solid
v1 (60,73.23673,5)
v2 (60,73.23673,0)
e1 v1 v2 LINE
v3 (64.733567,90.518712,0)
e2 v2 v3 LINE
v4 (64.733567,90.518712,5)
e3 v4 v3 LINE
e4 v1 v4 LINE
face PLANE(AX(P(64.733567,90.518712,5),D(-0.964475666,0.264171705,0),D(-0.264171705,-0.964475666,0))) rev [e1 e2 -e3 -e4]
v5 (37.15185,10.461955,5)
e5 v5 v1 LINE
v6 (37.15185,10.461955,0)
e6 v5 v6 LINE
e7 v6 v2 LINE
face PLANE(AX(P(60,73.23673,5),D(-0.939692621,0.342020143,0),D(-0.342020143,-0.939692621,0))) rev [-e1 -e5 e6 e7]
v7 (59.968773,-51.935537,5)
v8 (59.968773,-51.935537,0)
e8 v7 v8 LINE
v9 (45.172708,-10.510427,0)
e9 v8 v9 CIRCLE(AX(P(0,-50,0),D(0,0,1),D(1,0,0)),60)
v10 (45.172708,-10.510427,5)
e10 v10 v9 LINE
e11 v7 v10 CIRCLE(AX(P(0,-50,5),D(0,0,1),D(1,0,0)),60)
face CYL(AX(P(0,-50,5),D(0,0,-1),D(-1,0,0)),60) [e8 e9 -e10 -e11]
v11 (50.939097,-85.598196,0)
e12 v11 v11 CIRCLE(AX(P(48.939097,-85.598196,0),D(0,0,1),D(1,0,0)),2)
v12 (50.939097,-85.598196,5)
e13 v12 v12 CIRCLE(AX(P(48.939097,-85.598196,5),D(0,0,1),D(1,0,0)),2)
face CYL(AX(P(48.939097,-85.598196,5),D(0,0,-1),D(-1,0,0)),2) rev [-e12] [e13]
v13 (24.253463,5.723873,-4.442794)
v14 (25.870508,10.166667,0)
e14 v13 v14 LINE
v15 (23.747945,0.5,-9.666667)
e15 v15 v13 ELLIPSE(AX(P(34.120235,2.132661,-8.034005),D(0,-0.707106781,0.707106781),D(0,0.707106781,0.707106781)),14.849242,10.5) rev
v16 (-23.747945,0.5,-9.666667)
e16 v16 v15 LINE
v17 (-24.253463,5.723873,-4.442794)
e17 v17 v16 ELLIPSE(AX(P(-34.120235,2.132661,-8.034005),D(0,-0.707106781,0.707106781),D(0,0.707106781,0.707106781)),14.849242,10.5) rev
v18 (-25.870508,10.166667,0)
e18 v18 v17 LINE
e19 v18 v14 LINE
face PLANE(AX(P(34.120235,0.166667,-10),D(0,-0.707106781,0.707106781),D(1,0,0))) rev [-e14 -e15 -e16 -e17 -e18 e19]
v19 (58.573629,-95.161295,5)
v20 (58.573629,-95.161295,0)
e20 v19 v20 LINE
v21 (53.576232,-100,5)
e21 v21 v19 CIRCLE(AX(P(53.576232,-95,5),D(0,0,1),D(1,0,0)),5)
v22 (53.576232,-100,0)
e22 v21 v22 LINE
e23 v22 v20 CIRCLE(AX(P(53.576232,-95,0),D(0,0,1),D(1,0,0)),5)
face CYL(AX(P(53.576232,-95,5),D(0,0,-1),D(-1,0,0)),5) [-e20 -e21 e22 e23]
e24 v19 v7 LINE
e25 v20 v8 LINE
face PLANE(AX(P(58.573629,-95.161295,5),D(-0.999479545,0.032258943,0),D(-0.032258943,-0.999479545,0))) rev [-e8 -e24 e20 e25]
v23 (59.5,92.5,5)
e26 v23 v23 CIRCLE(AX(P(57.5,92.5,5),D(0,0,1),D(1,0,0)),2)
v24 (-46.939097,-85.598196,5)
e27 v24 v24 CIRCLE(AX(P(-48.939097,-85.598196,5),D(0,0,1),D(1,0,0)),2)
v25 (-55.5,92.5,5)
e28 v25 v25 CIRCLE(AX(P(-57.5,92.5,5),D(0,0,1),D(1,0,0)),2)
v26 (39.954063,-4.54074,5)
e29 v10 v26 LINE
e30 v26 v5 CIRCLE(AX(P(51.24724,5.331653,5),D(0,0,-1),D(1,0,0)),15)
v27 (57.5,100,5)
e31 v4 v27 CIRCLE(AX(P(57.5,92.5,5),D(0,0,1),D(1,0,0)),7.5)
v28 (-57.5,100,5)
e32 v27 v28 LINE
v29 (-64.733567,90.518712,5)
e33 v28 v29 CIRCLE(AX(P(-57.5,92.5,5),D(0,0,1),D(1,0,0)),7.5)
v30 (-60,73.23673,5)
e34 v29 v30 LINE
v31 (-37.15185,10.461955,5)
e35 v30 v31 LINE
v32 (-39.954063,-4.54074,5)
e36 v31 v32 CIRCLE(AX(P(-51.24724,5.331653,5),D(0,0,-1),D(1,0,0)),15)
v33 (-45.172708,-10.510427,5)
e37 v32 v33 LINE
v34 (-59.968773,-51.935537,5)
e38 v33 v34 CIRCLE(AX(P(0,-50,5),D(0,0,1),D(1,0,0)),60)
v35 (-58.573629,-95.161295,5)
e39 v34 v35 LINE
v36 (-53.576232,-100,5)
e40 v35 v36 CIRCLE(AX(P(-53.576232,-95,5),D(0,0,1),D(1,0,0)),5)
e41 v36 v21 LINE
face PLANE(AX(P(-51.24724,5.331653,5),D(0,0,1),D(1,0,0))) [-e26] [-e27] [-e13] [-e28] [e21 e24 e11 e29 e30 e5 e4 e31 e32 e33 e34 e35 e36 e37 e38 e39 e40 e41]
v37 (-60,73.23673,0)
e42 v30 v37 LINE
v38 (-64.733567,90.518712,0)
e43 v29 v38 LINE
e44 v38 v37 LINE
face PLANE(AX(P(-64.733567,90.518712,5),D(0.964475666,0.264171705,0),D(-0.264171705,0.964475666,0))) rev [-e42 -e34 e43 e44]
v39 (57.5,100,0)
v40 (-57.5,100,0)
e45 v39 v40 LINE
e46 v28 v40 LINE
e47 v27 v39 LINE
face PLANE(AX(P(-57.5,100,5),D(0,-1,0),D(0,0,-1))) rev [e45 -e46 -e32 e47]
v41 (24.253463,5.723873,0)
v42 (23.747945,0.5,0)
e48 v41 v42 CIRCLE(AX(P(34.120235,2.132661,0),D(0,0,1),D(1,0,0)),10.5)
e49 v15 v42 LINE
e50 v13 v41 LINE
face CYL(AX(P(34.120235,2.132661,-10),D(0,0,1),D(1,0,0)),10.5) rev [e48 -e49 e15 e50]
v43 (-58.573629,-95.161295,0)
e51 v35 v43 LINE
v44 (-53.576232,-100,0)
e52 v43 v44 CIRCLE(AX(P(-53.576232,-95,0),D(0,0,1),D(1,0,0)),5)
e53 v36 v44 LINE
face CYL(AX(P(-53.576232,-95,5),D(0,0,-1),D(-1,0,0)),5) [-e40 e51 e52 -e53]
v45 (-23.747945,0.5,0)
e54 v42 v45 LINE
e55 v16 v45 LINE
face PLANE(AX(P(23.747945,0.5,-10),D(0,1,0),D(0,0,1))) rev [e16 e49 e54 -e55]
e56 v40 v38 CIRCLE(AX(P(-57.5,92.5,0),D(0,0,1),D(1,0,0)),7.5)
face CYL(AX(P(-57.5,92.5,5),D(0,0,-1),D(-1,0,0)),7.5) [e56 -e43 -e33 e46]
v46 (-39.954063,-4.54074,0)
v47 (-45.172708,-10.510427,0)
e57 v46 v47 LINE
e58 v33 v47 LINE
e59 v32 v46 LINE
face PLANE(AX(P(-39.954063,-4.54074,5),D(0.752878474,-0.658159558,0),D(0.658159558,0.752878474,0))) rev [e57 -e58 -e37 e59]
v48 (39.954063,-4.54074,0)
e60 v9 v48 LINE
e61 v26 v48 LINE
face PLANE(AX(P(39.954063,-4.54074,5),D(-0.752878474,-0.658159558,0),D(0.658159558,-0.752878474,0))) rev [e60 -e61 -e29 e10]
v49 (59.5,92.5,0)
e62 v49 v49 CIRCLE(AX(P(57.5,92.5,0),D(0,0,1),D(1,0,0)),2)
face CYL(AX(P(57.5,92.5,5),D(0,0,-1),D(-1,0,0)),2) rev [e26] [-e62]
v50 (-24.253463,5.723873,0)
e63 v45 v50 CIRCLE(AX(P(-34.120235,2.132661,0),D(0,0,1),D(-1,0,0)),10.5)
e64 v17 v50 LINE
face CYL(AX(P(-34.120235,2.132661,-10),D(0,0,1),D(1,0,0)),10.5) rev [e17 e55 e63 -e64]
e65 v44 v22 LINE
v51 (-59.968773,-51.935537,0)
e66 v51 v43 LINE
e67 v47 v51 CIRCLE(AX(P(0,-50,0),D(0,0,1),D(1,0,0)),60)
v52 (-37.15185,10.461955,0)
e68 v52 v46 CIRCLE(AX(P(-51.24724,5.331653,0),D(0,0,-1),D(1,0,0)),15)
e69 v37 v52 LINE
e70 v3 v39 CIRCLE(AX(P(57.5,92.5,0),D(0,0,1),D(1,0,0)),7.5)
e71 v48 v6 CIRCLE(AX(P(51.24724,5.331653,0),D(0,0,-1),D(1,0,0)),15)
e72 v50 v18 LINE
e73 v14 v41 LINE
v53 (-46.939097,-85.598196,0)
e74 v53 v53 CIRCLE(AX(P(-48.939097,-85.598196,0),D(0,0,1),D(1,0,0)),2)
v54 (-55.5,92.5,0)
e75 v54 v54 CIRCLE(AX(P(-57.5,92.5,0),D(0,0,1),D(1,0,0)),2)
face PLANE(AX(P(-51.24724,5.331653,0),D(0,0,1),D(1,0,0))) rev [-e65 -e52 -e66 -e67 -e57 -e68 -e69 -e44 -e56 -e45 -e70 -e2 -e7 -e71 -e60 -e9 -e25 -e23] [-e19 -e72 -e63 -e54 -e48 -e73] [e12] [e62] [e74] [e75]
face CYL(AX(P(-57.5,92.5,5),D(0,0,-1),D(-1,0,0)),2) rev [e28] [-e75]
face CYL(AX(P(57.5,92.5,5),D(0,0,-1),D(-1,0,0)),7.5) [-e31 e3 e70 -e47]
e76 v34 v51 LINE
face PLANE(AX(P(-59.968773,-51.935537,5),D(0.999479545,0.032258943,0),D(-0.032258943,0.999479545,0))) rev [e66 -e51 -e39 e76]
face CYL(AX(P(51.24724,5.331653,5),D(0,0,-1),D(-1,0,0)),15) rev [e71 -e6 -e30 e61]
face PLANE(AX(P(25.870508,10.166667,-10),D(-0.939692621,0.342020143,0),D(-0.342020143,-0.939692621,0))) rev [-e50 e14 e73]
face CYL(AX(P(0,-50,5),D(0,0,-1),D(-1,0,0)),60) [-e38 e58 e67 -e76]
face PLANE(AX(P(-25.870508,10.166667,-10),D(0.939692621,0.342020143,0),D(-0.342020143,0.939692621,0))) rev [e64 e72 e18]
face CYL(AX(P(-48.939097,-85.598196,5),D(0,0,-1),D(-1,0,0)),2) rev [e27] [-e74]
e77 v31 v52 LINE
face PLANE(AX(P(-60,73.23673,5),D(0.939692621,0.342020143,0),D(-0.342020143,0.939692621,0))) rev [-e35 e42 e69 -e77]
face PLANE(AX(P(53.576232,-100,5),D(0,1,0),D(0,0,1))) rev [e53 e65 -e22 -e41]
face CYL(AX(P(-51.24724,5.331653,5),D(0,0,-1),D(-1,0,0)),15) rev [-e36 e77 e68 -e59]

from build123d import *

# Parameters (mm, degrees)
SKETCH1_R           = 2
BOSS_EXTRUDE1_DEPTH = 5
BOSS_EXTRUDE2_DEPTH = 10
CHAMFER2_SIZE       = 10


with BuildPart() as part:
    # Sketch1 → Boss-Extrude1 (new body)
    with BuildSketch(Plane.XY):
        with BuildLine():
            Line((-39.95406266, -4.540740277), (-45.172708428, -10.510426525))
            ThreePointArc((-45.172708428, -10.510426525), (-56.503917554, -29.818144261), (-59.968772691, -51.935536587))
            Line((-59.968772691, -51.935536587), (-58.57362931, -95.161294716))
            ThreePointArc((-58.57362931, -95.161294716), (-57.054271725, -98.592107569), (-53.576231585, -100))
            Line((-53.576231585, -100), (-50, -100))
            Line((-50, -100), (50, -100))
            Line((50, -100), (53.576231585, -100))
            ThreePointArc((53.576231585, -100), (57.054271725, -98.592107569), (58.57362931, -95.161294716))
            Line((58.57362931, -95.161294716), (59.968772691, -51.935536587))
            ThreePointArc((59.968772691, -51.935536587), (56.503917554, -29.818144261), (45.172708428, -10.510426525))
            Line((45.172708428, -10.510426525), (39.95406266, -4.540740277))
            ThreePointArc((39.95406266, -4.540740277), (36.502239109, 2.577573283), (37.151850455, 10.461955241))
            Line((37.151850455, 10.461955241), (60, 73.236730193))
            Line((60, 73.236730193), (64.733567494, 90.51871221))
            ThreePointArc((64.733567494, 90.51871221), (63.462787034, 97.049194521), (57.5, 100))
            Line((57.5, 100), (55, 100))
            Line((55, 100), (-55, 100))
            Line((-55, 100), (-57.5, 100))
            ThreePointArc((-57.5, 100), (-63.462787034, 97.049194521), (-64.733567494, 90.51871221))
            Line((-64.733567494, 90.51871221), (-60, 73.236730193))
            Line((-60, 73.236730193), (-37.151850455, 10.461955241))
            ThreePointArc((-37.151850455, 10.461955241), (-36.502239109, 2.577573283), (-39.95406266, -4.540740277))
        make_face()
        with Locations((-57.5, 92.5)):
            Circle(SKETCH1_R, mode=Mode.SUBTRACT)
        with Locations((57.5, 92.5)):
            Circle(SKETCH1_R, mode=Mode.SUBTRACT)
        with Locations((48.939097244, -85.598196118)):
            Circle(SKETCH1_R, mode=Mode.SUBTRACT)
        with Locations((-48.939097244, -85.598196118)):
            Circle(SKETCH1_R, mode=Mode.SUBTRACT)
    extrude(amount=BOSS_EXTRUDE1_DEPTH)

    # Sketch2 → Boss-Extrude2 (add)
    with BuildSketch(Plane(origin=(0, 0, 0), x_dir=(-1, 0, 0), z_dir=(0, 0, -1))):
        with BuildLine():
            Line((-23.747944524, 0.5), (23.747944524, 0.5))
            ThreePointArc((23.747944524, 0.5), (23.669056818, 3.144030102), (24.253462846, 5.723872742))
            Line((24.253462846, 5.723872742), (25.870507592, 10.166666667))
            Line((25.870507592, 10.166666667), (-25.870507592, 10.166666667))
            Line((-25.870507592, 10.166666667), (-24.253462846, 5.723872742))
            ThreePointArc((-24.253462846, 5.723872742), (-23.669056818, 3.144030102), (-23.747944524, 0.5))
        make_face()
    extrude(amount=BOSS_EXTRUDE2_DEPTH)

    # Chamfer2
    # the kernel refuses this chamfer: 10 mm, written as the material it takes off along each edge
    with BuildSketch(Plane(origin=(-51.587337472, 10.166666667, -10), x_dir=(0, 0.027495876610586317, 0.9996219169112968), z_dir=(1, 0, 0))) as chamfer2_piece_1_section:
        Polygon((CHAMFER2_SIZE * 0.999621916911, CHAMFER2_SIZE * 0.0274958766106), (-CHAMFER2_SIZE * 0.0274958766106, CHAMFER2_SIZE * 0.999621916911), (0, 0), align=None)
    chamfer2_piece_1 = extrude(amount=103.174674944, mode=Mode.PRIVATE)
    chamfer2_piece_1 = split(chamfer2_piece_1, bisect_by=Plane(origin=(0, 6.862625123, 0), z_dir=(0, 0, -1)), keep=Keep.TOP, mode=Mode.PRIVATE)
    add(chamfer2_piece_1, mode=Mode.SUBTRACT)


solid = part.part
